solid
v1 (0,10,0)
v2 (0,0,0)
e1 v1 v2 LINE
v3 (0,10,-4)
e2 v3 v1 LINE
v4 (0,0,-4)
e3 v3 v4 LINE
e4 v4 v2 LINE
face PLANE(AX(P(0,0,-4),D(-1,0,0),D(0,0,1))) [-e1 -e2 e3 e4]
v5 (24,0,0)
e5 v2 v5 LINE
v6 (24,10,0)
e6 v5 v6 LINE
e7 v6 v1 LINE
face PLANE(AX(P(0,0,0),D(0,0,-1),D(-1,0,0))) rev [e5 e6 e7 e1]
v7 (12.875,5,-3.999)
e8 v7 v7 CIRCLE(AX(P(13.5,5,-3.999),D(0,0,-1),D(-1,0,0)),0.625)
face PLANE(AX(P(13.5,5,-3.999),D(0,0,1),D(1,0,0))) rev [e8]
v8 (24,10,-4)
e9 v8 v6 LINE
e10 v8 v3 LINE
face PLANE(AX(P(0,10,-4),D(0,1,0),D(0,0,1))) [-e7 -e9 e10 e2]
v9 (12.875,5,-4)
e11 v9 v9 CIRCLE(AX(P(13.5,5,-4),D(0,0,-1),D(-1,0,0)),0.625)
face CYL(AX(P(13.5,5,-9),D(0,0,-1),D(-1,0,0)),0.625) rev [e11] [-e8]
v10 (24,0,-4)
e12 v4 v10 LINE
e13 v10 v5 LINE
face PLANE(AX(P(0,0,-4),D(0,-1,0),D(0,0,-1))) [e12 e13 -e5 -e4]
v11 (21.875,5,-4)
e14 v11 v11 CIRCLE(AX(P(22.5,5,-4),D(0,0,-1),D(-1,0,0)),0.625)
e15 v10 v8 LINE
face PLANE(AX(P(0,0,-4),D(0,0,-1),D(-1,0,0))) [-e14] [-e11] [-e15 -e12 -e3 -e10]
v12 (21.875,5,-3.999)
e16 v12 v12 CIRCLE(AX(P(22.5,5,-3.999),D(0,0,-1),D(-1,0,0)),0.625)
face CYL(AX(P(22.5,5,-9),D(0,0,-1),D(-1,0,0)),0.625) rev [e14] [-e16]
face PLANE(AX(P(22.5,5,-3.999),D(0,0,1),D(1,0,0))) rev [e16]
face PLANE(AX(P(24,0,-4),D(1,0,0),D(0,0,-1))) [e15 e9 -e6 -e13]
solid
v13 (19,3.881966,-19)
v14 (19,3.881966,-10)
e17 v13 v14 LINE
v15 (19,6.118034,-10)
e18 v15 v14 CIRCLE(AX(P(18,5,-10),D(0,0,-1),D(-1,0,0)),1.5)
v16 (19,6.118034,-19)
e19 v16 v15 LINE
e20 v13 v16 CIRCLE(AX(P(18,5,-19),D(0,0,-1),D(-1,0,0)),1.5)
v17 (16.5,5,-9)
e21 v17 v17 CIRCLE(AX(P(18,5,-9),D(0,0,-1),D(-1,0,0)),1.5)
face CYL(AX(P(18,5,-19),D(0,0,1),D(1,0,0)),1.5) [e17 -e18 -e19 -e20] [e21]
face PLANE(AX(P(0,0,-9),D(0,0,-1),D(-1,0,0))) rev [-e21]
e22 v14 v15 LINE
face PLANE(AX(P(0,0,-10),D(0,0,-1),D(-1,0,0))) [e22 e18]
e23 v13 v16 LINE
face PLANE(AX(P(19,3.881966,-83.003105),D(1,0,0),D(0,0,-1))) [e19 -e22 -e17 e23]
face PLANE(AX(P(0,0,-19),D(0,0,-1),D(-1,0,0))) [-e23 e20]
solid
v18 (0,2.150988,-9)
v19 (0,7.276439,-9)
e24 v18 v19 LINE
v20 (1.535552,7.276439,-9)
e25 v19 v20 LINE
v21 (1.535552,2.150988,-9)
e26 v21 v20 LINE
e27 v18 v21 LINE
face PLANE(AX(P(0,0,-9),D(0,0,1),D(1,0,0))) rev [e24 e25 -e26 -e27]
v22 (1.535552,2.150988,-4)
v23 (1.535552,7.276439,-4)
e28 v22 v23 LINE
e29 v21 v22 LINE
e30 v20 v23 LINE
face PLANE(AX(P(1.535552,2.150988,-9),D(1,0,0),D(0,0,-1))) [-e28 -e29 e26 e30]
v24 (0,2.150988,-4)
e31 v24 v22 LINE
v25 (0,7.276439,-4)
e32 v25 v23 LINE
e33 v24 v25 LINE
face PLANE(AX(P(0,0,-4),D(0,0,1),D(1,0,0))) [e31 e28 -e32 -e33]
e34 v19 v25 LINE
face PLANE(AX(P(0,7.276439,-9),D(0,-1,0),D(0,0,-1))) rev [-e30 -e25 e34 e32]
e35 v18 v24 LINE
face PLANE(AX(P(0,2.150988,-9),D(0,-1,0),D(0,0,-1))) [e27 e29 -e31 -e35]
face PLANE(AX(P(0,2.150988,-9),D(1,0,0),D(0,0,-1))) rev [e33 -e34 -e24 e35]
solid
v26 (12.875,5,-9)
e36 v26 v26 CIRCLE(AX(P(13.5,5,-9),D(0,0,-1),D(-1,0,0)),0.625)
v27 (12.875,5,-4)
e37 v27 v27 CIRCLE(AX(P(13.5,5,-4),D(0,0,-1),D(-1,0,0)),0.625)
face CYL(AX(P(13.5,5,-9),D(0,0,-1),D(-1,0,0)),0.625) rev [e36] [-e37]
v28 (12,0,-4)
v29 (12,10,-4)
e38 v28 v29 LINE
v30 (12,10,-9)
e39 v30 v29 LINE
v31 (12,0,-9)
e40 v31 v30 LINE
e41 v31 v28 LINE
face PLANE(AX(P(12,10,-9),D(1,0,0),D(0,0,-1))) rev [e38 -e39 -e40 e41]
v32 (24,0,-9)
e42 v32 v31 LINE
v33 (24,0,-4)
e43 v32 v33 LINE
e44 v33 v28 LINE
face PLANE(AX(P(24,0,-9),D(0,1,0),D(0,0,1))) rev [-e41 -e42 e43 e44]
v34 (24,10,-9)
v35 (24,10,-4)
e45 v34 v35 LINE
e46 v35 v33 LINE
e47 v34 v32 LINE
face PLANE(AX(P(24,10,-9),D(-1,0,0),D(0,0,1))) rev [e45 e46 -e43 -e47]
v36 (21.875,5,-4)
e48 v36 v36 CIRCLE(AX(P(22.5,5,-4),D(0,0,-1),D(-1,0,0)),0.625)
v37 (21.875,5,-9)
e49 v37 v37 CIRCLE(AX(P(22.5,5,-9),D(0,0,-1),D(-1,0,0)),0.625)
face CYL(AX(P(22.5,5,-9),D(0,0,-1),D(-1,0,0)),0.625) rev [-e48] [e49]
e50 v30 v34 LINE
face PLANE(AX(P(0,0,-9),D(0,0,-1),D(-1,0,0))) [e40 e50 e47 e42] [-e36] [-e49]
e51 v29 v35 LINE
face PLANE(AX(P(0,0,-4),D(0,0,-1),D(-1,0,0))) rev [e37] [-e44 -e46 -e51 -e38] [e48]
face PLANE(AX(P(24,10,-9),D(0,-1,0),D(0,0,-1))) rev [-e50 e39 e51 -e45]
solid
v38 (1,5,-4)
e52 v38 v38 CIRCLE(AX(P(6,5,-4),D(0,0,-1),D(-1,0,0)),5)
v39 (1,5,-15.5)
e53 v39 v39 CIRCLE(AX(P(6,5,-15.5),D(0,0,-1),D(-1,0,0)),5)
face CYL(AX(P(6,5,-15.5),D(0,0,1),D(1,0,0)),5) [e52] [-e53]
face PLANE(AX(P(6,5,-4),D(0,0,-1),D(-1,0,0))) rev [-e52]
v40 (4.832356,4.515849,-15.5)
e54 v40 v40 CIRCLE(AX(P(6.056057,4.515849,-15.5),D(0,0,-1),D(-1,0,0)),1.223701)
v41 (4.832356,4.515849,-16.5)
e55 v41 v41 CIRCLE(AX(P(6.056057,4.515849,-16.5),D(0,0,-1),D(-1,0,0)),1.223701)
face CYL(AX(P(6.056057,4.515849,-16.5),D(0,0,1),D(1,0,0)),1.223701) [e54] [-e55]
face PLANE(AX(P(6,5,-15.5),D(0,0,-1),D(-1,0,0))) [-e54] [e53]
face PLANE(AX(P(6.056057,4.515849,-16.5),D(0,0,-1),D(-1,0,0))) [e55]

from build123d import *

# Parameters (mm, degrees)
SKETCH_1_W                   = 24
SKETCH_1_H                   = 10
EXTRUDE_1_DEPTH              = 4
SKETCH_2_R                   = 5
EXTRUDE_2_DEPTH              = 11.5
SKETCH_4_R                   = 1.223700811
EXTRUDE_3_DEPTH              = 1
SKETCH_5_W                   = 12
SKETCH_5_H                   = 10
EXTRUDE_4_DEPTH              = 5
SKETCH_6_R                   = 1.5
EXTRUDE_5_DEPTH              = 10
HOLE_START                   = -9
HOLE_WIZARD_M1_6_1_OUTLINE_R = 0.625
HOLE_WIZARD_M1_6_1_DEPTH     = 5.001
SKETCH_9_W                   = 1.535552224
SKETCH_9_H                   = 5.125451512
EXTRUDE_6_DEPTH              = 5
CUT_EXTRUDE1_DEPTH           = 33.202484376
CUT_EXTRUDE1_DEPTH_BACK      = 9


# Read off the part's stored shape, not the designer's step: M1.6 螺纹孔1
with BuildPart() as part:
    # 草图1 → 凸台-拉伸1 (new body)
    with BuildSketch(Plane.XY):
        with Locations((12, 5)):
            Rectangle(SKETCH_1_W, SKETCH_1_H)
    extrude(amount=-EXTRUDE_1_DEPTH)


with BuildPart() as body_2:
    # 草图2 → 凸台-拉伸2 (new body)
    with BuildSketch(Plane(origin=(0, 0, -4), x_dir=(-1, 0, 0), z_dir=(0, 0, -1))):
        with Locations((-6, 5)):
            Circle(SKETCH_2_R)
    extrude(amount=EXTRUDE_2_DEPTH)

    # 草图4 → 凸台-拉伸3 (add)
    with BuildSketch(Plane(origin=(0, 0, -15.5), x_dir=(-1, 0, 0), z_dir=(0, 0, -1))):
        with Locations((-6.056056762, 4.515848892)):
            Circle(SKETCH_4_R)
    extrude(amount=EXTRUDE_3_DEPTH)


with BuildPart() as body_3:
    # 草图5 → 凸台-拉伸4 (new body)
    with BuildSketch(Plane(origin=(0, 0, -4), x_dir=(-1, 0, 0), z_dir=(0, 0, -1))):
        with Locations((-18, 5)):
            Rectangle(SKETCH_5_W, SKETCH_5_H)
    extrude(amount=EXTRUDE_4_DEPTH)


with BuildPart() as body_4:
    # 草图6 → 凸台-拉伸5 (new body)
    with BuildSketch(Plane(origin=(0, 0, -9), x_dir=(-1, 0, 0), z_dir=(0, 0, -1))):
        with Locations((-18, 5)):
            Circle(SKETCH_6_R)
    extrude(amount=EXTRUDE_5_DEPTH)

    # Sketch1 → Cut-Extrude1 (cut, two sides: drawn at the far end of the back side and taken through both)
    with BuildSketch(Plane(origin=(0, 0, -19), x_dir=(-1, 0, 0), z_dir=(0, 0, -1)).offset(-CUT_EXTRUDE1_DEPTH_BACK)):
        Polygon((-19, -46.039473837), (-19, 3.881966011), (-19, 6.118033989), (-19, 56.039473837), (-118.842879696, 56.039473837), (-118.842879696, -46.039473837), align=None)
    extrude(amount=CUT_EXTRUDE1_DEPTH + CUT_EXTRUDE1_DEPTH_BACK, mode=Mode.SUBTRACT)


with BuildPart() as hole_wizard_m1_6_1_tool:
    # M1.6 螺纹孔1 outline → M1.6 螺纹孔1 (new body)
    with BuildSketch(Plane.XY.offset(HOLE_START)):
        with Locations((13.5, 5)):
            Circle(HOLE_WIZARD_M1_6_1_OUTLINE_R)
        with Locations((22.5, 5)):
            Circle(HOLE_WIZARD_M1_6_1_OUTLINE_R)
    extrude(amount=HOLE_WIZARD_M1_6_1_DEPTH)


with BuildPart() as part_1:
    add(part.part)

    # M1.6 螺纹孔1: cut by hole_wizard_m1_6_1_tool
    add(hole_wizard_m1_6_1_tool.part, mode=Mode.SUBTRACT)


with BuildPart() as body_3_1:
    add(body_3.part)

    # M1.6 螺纹孔1: cut by hole_wizard_m1_6_1_tool
    add(hole_wizard_m1_6_1_tool.part, mode=Mode.SUBTRACT)


with BuildPart() as body_5:
    # 草图9 → 凸台-拉伸6 (new body)
    with BuildSketch(Plane(origin=(0, 0, -4), x_dir=(-1, 0, 0), z_dir=(0, 0, -1))):
        with Locations((-0.767776112, 4.713713687)):
            Rectangle(SKETCH_9_W, SKETCH_9_H)
    extrude(amount=EXTRUDE_6_DEPTH)


solid = Compound([body_2.part, body_4.part, part_1.part, body_3_1.part, body_5.part])
